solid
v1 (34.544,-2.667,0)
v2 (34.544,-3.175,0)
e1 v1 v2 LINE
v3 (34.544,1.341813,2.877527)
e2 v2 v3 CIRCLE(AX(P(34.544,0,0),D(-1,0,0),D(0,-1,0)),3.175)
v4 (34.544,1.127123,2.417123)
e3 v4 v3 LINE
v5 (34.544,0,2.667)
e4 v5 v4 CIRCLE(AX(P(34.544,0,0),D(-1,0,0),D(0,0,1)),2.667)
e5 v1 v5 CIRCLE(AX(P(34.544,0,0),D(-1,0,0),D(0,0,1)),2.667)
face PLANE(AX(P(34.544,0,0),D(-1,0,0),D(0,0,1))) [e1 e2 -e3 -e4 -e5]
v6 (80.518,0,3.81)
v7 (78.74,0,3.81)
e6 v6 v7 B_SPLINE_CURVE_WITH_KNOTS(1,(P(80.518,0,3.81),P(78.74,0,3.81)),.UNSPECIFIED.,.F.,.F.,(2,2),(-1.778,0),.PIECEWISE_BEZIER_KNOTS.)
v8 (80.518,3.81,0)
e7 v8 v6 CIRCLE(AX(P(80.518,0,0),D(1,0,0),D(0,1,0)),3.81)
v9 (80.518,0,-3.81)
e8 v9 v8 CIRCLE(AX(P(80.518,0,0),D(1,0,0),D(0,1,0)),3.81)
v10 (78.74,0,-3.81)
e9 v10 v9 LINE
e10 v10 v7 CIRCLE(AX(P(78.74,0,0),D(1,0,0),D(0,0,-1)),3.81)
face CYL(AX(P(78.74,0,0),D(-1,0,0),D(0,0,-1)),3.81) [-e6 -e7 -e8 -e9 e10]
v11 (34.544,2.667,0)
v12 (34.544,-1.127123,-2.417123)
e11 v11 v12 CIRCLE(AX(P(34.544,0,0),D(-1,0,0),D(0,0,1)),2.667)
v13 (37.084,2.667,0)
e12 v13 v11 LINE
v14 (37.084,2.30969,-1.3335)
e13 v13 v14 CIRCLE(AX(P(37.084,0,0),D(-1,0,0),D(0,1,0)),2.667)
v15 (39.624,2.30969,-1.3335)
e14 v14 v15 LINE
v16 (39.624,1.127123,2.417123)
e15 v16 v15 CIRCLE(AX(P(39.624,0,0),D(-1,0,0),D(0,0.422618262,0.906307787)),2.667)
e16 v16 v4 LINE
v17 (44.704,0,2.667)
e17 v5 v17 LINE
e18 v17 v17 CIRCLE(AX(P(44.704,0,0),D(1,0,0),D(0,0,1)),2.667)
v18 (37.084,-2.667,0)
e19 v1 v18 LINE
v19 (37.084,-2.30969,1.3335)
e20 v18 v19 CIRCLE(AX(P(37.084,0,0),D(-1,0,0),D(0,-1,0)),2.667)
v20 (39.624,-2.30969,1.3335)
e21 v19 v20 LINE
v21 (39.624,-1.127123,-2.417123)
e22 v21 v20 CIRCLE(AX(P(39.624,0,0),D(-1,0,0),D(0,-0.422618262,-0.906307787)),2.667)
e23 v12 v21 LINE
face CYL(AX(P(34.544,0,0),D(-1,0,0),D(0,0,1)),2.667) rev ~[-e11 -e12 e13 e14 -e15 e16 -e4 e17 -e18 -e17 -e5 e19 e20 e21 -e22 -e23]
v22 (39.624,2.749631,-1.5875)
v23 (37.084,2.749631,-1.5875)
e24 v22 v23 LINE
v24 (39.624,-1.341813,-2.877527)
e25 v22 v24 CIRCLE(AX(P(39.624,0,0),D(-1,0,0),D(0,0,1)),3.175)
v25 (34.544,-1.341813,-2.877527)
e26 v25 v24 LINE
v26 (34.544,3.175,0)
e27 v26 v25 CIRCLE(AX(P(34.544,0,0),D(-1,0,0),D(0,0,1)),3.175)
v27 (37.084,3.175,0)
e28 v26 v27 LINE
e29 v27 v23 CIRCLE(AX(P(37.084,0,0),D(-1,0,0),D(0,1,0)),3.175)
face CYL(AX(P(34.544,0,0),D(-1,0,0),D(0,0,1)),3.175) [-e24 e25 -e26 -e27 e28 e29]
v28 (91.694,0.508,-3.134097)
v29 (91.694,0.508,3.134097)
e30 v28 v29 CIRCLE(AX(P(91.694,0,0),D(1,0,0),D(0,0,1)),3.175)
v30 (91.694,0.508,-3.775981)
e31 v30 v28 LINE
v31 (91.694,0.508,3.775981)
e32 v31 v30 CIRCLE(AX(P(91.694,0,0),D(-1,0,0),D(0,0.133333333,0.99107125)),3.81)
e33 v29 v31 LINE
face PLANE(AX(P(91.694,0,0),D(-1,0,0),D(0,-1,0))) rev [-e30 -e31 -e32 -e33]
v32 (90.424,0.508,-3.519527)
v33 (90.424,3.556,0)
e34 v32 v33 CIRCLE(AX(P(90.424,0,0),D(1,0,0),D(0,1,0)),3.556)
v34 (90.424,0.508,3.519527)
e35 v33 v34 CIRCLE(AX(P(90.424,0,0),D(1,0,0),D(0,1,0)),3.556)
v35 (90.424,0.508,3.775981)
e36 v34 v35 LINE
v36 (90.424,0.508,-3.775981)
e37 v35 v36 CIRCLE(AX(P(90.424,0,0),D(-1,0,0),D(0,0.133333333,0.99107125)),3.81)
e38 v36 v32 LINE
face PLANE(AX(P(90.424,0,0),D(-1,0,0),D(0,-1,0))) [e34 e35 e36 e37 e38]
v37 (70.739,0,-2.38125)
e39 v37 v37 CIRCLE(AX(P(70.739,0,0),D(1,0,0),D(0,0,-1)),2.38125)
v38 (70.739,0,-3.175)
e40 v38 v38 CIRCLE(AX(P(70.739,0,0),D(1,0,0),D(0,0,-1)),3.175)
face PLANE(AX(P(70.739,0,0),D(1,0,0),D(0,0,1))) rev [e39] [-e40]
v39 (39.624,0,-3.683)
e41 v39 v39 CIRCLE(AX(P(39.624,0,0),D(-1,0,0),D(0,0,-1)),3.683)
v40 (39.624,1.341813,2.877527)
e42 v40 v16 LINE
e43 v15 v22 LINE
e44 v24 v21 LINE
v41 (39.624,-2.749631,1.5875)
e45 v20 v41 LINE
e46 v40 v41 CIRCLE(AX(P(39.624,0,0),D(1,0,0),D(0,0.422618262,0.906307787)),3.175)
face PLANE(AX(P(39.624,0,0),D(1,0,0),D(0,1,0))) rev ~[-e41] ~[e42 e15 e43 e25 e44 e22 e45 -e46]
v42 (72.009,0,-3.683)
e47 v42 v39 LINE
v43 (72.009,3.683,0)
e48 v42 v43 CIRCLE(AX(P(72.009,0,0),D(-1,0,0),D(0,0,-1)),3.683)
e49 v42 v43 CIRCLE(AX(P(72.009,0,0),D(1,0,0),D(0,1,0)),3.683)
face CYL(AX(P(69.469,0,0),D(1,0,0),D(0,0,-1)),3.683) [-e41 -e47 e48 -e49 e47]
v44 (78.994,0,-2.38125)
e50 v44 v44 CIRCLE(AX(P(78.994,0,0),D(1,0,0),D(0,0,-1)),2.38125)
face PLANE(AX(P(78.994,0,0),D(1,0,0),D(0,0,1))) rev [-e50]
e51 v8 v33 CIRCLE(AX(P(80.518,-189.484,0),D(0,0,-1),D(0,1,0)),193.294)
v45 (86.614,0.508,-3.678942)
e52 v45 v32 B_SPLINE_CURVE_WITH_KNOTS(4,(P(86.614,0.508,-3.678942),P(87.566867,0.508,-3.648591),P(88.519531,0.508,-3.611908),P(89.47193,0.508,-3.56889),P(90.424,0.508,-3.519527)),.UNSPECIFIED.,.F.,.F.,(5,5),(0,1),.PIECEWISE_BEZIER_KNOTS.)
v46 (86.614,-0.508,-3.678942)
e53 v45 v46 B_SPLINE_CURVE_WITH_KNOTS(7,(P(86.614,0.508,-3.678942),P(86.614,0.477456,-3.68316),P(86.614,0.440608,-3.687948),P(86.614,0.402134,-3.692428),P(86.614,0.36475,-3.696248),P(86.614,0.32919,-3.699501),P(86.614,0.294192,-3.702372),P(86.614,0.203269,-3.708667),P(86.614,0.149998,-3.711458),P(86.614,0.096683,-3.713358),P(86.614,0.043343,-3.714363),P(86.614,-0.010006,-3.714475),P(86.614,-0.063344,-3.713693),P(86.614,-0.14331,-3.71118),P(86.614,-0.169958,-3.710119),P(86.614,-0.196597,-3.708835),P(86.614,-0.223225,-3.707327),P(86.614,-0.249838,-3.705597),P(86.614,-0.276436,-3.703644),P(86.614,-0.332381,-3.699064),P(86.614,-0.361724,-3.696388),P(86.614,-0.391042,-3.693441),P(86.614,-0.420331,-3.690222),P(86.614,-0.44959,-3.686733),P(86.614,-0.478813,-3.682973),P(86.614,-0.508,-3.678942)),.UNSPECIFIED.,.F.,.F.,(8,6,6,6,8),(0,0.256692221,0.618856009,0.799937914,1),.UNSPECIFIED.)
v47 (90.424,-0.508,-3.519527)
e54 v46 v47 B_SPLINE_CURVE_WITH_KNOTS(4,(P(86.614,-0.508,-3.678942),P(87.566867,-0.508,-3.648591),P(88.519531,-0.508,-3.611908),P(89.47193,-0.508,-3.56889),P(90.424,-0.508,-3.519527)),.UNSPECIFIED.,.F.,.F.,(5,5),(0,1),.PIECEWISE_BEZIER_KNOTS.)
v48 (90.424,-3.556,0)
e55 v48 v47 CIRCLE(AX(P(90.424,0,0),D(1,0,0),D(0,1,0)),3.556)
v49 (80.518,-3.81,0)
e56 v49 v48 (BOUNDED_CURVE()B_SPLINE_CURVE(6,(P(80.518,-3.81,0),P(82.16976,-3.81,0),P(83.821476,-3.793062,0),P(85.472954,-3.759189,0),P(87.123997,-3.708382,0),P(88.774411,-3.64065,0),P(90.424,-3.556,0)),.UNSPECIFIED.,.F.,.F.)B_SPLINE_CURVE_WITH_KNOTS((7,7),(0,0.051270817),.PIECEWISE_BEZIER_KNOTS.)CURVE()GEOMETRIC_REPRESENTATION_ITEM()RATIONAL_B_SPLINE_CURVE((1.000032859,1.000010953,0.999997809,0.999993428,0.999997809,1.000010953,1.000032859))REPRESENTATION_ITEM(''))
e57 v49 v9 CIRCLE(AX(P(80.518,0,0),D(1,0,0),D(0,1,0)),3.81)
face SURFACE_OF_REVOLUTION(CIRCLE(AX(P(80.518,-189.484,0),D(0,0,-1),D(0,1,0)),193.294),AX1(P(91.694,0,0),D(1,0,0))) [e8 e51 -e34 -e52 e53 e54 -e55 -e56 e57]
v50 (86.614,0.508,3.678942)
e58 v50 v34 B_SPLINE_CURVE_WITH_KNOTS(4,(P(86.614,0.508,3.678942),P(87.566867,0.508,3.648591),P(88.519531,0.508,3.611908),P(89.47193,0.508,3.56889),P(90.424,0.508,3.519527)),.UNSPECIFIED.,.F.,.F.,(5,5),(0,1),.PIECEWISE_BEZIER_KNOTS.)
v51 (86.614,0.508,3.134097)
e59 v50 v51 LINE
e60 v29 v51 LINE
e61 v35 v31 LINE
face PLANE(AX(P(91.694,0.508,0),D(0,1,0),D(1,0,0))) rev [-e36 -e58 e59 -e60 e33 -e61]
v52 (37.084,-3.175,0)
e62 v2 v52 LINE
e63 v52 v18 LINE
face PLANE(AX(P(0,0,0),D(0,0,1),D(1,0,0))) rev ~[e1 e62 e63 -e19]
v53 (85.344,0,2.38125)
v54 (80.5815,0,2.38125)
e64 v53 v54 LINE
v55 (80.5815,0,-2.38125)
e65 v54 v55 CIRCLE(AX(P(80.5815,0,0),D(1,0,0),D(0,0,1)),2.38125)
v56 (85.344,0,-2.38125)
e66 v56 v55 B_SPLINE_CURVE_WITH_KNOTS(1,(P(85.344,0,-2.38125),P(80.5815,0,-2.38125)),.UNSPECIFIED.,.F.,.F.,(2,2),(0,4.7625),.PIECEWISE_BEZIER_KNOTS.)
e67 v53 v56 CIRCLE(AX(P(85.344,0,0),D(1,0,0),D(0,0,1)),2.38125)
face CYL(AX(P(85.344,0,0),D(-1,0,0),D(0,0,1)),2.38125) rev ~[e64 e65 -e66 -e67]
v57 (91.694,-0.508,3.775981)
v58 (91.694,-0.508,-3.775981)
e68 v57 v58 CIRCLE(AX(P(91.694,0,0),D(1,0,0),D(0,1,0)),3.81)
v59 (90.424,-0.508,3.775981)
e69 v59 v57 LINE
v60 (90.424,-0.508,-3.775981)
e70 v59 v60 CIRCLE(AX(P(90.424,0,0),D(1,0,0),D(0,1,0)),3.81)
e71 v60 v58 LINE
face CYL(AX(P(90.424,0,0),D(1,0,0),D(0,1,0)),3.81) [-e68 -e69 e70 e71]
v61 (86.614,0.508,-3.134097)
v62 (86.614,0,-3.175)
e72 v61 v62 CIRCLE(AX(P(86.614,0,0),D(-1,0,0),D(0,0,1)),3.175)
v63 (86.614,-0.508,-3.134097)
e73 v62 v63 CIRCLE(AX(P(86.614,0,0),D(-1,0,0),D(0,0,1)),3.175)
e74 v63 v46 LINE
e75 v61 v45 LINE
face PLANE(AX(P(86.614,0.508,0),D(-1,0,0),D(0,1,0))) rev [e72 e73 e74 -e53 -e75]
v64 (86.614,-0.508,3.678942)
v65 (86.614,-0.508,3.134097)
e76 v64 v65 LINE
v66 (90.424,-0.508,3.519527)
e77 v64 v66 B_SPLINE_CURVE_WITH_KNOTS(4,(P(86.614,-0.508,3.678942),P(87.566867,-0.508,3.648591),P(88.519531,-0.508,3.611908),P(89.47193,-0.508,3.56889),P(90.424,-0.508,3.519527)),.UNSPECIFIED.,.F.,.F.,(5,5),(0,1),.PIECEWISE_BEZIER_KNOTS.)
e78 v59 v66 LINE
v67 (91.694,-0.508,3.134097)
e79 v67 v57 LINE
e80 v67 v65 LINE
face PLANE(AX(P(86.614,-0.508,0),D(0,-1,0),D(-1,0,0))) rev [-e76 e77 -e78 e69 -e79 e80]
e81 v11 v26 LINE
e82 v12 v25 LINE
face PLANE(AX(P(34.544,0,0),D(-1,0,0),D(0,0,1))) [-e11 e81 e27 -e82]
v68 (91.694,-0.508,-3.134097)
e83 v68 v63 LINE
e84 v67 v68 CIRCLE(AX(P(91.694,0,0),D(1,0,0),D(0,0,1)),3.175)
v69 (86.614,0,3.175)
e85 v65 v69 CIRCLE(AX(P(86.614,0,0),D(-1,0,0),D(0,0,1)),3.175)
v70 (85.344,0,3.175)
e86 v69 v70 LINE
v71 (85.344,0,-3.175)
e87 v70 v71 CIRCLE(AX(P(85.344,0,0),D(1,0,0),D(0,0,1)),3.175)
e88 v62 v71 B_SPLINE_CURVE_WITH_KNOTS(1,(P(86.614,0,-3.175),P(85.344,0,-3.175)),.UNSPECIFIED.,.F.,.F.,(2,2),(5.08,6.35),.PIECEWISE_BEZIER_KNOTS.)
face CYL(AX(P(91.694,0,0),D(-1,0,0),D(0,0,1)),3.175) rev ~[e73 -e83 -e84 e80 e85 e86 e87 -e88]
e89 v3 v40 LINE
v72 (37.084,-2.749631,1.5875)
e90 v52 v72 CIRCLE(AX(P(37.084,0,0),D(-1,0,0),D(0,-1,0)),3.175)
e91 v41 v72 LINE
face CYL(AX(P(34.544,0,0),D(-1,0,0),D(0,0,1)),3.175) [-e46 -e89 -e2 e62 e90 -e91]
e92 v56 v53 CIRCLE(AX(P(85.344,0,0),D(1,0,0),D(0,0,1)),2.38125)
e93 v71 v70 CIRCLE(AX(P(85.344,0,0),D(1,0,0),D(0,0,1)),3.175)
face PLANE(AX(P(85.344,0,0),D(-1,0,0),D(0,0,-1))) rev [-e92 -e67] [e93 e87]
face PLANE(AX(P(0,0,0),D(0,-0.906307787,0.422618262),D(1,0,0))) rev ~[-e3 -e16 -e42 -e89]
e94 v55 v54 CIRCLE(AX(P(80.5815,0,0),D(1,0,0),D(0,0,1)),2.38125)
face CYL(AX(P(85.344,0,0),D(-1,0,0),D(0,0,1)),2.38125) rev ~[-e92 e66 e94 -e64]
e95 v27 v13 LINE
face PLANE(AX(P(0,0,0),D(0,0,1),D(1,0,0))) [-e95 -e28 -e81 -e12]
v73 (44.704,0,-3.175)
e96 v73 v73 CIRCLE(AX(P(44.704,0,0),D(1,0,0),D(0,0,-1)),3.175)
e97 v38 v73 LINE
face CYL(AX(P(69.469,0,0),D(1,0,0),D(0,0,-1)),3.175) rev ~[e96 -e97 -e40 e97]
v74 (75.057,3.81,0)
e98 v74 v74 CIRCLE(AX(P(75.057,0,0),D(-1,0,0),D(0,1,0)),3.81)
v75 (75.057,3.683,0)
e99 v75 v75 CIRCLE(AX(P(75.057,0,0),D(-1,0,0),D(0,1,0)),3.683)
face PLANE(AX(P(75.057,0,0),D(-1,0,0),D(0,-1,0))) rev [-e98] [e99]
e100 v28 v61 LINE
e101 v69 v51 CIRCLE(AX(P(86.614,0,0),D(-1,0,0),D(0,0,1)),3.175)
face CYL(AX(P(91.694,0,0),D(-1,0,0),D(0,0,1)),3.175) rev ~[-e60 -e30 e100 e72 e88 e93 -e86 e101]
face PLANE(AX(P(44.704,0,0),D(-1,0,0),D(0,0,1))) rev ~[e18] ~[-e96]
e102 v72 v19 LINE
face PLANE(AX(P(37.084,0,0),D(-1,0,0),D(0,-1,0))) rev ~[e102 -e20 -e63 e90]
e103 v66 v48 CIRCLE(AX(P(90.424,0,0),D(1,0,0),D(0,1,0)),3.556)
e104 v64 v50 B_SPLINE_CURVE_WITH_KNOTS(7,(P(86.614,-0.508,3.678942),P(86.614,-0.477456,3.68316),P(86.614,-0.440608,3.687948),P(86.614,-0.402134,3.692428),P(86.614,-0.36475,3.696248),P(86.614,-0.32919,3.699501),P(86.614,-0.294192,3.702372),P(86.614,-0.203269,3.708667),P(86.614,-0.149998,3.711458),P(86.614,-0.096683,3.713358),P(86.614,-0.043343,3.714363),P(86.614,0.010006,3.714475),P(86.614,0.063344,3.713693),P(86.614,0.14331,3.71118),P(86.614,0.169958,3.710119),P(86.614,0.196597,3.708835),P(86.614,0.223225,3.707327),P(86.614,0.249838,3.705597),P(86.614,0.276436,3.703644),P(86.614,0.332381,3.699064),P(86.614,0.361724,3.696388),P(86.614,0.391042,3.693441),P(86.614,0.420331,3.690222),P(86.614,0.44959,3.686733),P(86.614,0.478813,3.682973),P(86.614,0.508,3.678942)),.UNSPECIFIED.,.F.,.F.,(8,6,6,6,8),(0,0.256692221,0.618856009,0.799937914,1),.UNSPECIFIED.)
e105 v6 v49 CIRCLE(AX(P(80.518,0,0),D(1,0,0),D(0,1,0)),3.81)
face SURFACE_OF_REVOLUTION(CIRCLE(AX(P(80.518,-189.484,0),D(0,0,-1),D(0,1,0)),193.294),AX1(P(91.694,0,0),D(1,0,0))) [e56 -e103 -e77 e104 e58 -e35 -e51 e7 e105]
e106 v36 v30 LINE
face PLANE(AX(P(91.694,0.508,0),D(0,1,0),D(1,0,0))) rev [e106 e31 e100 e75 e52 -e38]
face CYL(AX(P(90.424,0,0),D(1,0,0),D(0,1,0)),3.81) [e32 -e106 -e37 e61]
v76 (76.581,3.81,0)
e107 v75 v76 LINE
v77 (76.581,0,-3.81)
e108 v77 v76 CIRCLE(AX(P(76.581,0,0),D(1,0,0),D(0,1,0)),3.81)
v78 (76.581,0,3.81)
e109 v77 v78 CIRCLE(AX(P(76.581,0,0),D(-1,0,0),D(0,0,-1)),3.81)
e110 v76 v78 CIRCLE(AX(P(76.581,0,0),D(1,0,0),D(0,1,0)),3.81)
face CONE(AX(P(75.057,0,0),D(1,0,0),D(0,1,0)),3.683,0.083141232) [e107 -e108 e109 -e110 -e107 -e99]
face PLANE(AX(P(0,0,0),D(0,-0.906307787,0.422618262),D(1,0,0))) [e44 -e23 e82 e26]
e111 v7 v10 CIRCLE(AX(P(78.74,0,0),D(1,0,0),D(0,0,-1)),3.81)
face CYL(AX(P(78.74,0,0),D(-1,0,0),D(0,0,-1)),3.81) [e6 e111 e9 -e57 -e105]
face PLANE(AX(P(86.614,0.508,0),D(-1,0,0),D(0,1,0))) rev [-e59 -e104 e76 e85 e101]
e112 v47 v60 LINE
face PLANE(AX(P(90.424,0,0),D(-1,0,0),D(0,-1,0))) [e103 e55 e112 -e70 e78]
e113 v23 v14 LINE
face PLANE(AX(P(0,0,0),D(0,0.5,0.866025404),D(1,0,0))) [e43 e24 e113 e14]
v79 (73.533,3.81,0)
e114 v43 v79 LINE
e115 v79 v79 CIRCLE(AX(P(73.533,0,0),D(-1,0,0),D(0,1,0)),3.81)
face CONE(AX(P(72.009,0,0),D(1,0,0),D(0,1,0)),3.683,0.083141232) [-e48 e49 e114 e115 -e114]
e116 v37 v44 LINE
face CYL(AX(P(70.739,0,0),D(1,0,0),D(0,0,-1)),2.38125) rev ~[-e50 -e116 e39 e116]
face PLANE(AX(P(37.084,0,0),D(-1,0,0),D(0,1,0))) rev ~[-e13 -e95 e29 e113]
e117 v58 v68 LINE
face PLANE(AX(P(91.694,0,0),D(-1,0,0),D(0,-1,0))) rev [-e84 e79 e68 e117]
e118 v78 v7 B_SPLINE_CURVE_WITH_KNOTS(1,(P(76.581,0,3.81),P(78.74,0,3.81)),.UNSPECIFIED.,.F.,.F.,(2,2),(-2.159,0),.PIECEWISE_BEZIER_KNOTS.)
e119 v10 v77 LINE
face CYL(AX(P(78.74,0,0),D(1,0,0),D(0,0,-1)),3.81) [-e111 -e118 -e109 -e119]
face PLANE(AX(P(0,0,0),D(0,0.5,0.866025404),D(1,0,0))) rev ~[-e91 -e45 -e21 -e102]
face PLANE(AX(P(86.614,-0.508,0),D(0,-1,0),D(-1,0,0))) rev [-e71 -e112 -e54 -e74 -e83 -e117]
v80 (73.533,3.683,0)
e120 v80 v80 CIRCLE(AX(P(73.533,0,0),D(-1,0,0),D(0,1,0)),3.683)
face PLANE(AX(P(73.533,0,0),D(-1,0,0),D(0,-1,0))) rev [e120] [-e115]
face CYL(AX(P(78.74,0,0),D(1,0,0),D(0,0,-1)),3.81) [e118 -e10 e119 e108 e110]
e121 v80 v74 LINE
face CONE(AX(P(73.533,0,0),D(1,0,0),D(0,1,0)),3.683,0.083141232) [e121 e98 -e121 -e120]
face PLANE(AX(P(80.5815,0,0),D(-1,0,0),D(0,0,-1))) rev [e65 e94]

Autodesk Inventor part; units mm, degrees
ref_plane "YZ Plane" through (0, 0, 0) normal (1, 0, 0) x (0, 1, 0)
sketch "Sketch1" plane through (0, 0, 0) normal (0, 0, 1) x (1, 0, 0)
  line L0 (0, 0) -> (1.778, 0)
  line L1 (1.778, 0) -> (1.778, 5.08)
  line L2 (1.778, 5.08) -> (0, 5.08)
  line L3 (0, 5.08) -> (0, 0)
  line L4 (1.778, 0) -> (11.049, 0)
  line L5 (11.049, 0) -> (11.049, 3.683)
  line L6 (11.049, 3.683) -> (1.778, 3.683)
  line L7 (1.778, 3.683) -> (1.778, 0)
  line L8 (8.509, 3.683) -> (6.985, 3.81)
  line L9 (6.985, 3.81) -> (6.985, 3.683)
  line L10 (6.985, 3.683) -> (5.461, 3.81)
  line L11 (5.461, 3.81) -> (5.461, 3.683)
  line L12 (5.461, 3.683) -> (3.937, 3.81)
  line L13 (3.937, 3.81) -> (3.937, 3.683)
  line L14 (0, 0) -> (0, 3.1252)
  line L15 (0, 3.81) -> (0.889, 3.81) construction
  line L16 (0, 3.81) -> (0, 0)
  arc A0 (0, 3.81) -> (-9.906, 3.556) centre (0, -189.484) ccw
  line L17 (-9.906, 3.556) -> (-9.906, 3.81)
  line L18 (-9.906, 3.81) -> (-11.176, 3.81)
  line L19 (-11.176, 3.81) -> (-11.176, 0)
  line L20 (-11.176, 0) -> (0, 0)
  dimension "d0" = 1.778
  dimension "d1" = 10.16
  dimension "d2" = 9.271
  dimension "d3" = 7.366
  dimension "d4" = 7.62
  dimension "d5" = 2.54
  dimension "d6" = 1.524
  dimension "d7" = 7.62
  dimension "d8" = 7.62
  dimension "d9" = 11.176
  dimension "d10" = 7.112
  dimension "d11" = 1.27
revolve "Revolution1" add sketch "Sketch1" angle 360 about axis through (-11.176, 0, 0) along (1, 0, 0)
sketch "Sketch2" plane through (0, 0, 0) normal (0, 0, 1) x (1, 0, 0)
  line L0 (-11.176, 0.508) -> (-6.096, 0.508)
  line L1 (-6.096, 0.508) -> (-6.096, -0.508)
  line L2 (-6.096, -0.508) -> (-11.176, -0.508)
  line L3 (-11.176, -0.508) -> (-11.176, 0.508)
  line L4 (-11.176, -3.81) -> (-11.176, 3.81) construction
  point P0 (0, 0)
  point P1 (-11.176, 0)
  dimension "d13" = 1.016
  dimension "d14" = 5.08
extrude "Extrusion1" cut sketch "Sketch2" along normal through all both and the other way through all
hole "Hole1" at (-11.176, 0, 0) direction (1, 0, 0) diameter 4.7625 depth 11.1125 counterbore diameter 6.35 counterbore depth 6.35
hole "Hole2" at (11.049, 0, 0) direction (-1, 0, 0) diameter 4.7625 depth 9.525 counterbore diameter 6.35 counterbore depth 1.27
sketch "Sketch3" plane through (1.778, 0, 0) normal (1, 0, 0) x (0, 0, -1)
  circle A0 centre (0, 0) radius 5.08 projected
  circle A1 centre (0, 0) radius 5.08
  circle A2 centre (0, 0) radius 3.683
  circle A3 centre (0, 0) radius 3.81 projected
  circle A4 centre (0, 0) radius 3.81
  circle A5 centre (0, 0) radius 3.81 projected
  circle A6 centre (0, 0) radius 3.683
extrude "Extrusion2" cut sketch "Sketch3" against normal blind 1.778 contours A0
extrude "Extrusion3" add sketch "Sketch3" along normal blind 2.159 contours A3
sketch "Sketch4" plane through (11.049, 0, 0) normal (1, 0, 0) x (0, 0, -1)
  circle A0 centre (0, 0) radius 3.683 projected
  circle A1 centre (0, 0) radius 3.175 projected
extrude "Extrusion4" add sketch "Sketch4" along normal blind 29.21
mirror "Mirror1" about plane through (40.259, 0, 0) normal (1, 0, 0) of "Revolution1", "Extrusion1", "Hole1", "Hole2", "Extrusion2", "Extrusion3", "Extrusion4"
ref_plane "Work Plane2" through (25.4, 0, 0) normal (-1, 0, 0) x (0, 0, 1)
sketch "Sketch7" plane through (25.4, 0, 0) normal (-1, 0, 0) x (0, 0, 1)
  circle A0 centre (0, 0) radius 5.715
  line L0 (0, 8.001) -> (0, -8.001) projected
  line L1 (0.635, 6.477) -> (-0.635, 6.477)
  line L2 (-0.635, 6.477) -> (-0.635, 5.6796)
  line L3 (-0.635, 5.461) -> (0, 5.461)
  line L4 (0.635, 5.6796) -> (0.635, 6.477)
  dimension "d43" = 11.43
  dimension "d44" = 0.635
  dimension "d45" = 0.635
  dimension "d46" = 0.254
  dimension "d47" = 0.762
extrude "Extrusion5" add sketch "Sketch7" along normal mid plane 1.27 contours A0 L0 | A0 L0
extrude "Extrusion6" add sketch "Sketch7" along normal mid plane 1.27 contours A0 L0 L1 L4 | A0 L2 L1 L0
pattern_circular "Circular Pattern1" count 13 over 360 about axis through (25.4, 0, 0) along (-1, 0, 0) of "Extrusion6"
ref_plane "Work Plane3" through (34.544, 0, 0) normal (-1, 0, 0) x (0, 0, 1)
sketch "Sketch8" plane through (-11.176, 0, 0) normal (-1, 0, 0) x (0, 0, 1)
  circle A0 centre (0, 0) radius 2.3813 projected
  circle A1 centre (0, 0) radius 16.574
  point P0 (0, 0)
extrude "Extrusion7" cut sketch "Sketch8" against normal blind 45.72 contours A0 | A1
sketch "Sketch9" plane through (34.544, 0, 0) normal (-1, 0, 0) x (0, 0, 1)
  circle A0 centre (0, 0) radius 3.175 projected
  circle A1 centre (0, 0) radius 3.175
  circle A2 centre (0, 0) radius 2.667
  circle A3 centre (0, 0) radius 3.683 projected
  circle A4 centre (0, 0) radius 3.683
  dimension "d58" = 0.508
extrude "Extrusion8" add sketch "Sketch9" against normal blind 10.16 contours A0
extrude "Extrusion9" cut sketch "Sketch9" against normal blind 5.08 contours A3
sketch "Sketch10" plane through (0, 0, 0) normal (0, 0, 1) x (1, 0, 0)
  line L0 (34.544, -2.667) -> (44.704, -2.667) projected
  line L1 (34.544, -3.175) -> (39.624, -3.175) projected
  line L2 (-18.3388, 0) -> (110.0328, 0) projected
  line L3 (34.544, 3.175) -> (39.624, 3.175)
  line L4 (39.624, 3.175) -> (39.624, 2.667)
  line L5 (39.624, 2.667) -> (34.544, 2.667)
  line L6 (34.544, 2.667) -> (34.544, 3.175)
  line L7 (34.544, -3.175) -> (39.624, -3.175)
  line L8 (39.624, -3.175) -> (39.624, -2.667)
  line L9 (39.624, -2.667) -> (34.544, -2.667)
  line L10 (34.544, -2.667) -> (34.544, -3.175)
  point P0 (0, 0)
  dimension "d63" = 5.08
revolve "Revolution2" cut sketch "Sketch10" angle 65 about axis through (0, 0, 0) along (1, 0, 0)
sketch "Sketch11" plane through (0, 0, 0) normal (0, 0, 1) x (1, 0, 0)
  line L0 (39.624, 3.175) -> (37.084, 3.175)
  line L1 (37.084, 3.175) -> (37.084, 2.667)
  line L2 (37.084, 2.667) -> (39.624, 2.667)
  line L3 (39.624, 2.667) -> (39.624, 3.175)
  line L4 (34.544, 1.1271) -> (39.624, 1.1271) projected
  line L5 (-18.3388, 0) -> (110.0328, 0) projected
  line L6 (39.624, -3.175) -> (37.084, -3.175)
  line L7 (37.084, -3.175) -> (37.084, -2.667)
  line L8 (37.084, -2.667) -> (39.624, -2.667)
  line L9 (39.624, -2.667) -> (39.624, -3.175)
  point P0 (0, 0)
  dimension "d65" = 2.54
revolve "Revolution3" cut sketch "Sketch11" angle 30 about axis through (0, 0, 0) along (-1, 0, 0)
equation "\"d8\" = d7"
properties part number "Motor Axle"
